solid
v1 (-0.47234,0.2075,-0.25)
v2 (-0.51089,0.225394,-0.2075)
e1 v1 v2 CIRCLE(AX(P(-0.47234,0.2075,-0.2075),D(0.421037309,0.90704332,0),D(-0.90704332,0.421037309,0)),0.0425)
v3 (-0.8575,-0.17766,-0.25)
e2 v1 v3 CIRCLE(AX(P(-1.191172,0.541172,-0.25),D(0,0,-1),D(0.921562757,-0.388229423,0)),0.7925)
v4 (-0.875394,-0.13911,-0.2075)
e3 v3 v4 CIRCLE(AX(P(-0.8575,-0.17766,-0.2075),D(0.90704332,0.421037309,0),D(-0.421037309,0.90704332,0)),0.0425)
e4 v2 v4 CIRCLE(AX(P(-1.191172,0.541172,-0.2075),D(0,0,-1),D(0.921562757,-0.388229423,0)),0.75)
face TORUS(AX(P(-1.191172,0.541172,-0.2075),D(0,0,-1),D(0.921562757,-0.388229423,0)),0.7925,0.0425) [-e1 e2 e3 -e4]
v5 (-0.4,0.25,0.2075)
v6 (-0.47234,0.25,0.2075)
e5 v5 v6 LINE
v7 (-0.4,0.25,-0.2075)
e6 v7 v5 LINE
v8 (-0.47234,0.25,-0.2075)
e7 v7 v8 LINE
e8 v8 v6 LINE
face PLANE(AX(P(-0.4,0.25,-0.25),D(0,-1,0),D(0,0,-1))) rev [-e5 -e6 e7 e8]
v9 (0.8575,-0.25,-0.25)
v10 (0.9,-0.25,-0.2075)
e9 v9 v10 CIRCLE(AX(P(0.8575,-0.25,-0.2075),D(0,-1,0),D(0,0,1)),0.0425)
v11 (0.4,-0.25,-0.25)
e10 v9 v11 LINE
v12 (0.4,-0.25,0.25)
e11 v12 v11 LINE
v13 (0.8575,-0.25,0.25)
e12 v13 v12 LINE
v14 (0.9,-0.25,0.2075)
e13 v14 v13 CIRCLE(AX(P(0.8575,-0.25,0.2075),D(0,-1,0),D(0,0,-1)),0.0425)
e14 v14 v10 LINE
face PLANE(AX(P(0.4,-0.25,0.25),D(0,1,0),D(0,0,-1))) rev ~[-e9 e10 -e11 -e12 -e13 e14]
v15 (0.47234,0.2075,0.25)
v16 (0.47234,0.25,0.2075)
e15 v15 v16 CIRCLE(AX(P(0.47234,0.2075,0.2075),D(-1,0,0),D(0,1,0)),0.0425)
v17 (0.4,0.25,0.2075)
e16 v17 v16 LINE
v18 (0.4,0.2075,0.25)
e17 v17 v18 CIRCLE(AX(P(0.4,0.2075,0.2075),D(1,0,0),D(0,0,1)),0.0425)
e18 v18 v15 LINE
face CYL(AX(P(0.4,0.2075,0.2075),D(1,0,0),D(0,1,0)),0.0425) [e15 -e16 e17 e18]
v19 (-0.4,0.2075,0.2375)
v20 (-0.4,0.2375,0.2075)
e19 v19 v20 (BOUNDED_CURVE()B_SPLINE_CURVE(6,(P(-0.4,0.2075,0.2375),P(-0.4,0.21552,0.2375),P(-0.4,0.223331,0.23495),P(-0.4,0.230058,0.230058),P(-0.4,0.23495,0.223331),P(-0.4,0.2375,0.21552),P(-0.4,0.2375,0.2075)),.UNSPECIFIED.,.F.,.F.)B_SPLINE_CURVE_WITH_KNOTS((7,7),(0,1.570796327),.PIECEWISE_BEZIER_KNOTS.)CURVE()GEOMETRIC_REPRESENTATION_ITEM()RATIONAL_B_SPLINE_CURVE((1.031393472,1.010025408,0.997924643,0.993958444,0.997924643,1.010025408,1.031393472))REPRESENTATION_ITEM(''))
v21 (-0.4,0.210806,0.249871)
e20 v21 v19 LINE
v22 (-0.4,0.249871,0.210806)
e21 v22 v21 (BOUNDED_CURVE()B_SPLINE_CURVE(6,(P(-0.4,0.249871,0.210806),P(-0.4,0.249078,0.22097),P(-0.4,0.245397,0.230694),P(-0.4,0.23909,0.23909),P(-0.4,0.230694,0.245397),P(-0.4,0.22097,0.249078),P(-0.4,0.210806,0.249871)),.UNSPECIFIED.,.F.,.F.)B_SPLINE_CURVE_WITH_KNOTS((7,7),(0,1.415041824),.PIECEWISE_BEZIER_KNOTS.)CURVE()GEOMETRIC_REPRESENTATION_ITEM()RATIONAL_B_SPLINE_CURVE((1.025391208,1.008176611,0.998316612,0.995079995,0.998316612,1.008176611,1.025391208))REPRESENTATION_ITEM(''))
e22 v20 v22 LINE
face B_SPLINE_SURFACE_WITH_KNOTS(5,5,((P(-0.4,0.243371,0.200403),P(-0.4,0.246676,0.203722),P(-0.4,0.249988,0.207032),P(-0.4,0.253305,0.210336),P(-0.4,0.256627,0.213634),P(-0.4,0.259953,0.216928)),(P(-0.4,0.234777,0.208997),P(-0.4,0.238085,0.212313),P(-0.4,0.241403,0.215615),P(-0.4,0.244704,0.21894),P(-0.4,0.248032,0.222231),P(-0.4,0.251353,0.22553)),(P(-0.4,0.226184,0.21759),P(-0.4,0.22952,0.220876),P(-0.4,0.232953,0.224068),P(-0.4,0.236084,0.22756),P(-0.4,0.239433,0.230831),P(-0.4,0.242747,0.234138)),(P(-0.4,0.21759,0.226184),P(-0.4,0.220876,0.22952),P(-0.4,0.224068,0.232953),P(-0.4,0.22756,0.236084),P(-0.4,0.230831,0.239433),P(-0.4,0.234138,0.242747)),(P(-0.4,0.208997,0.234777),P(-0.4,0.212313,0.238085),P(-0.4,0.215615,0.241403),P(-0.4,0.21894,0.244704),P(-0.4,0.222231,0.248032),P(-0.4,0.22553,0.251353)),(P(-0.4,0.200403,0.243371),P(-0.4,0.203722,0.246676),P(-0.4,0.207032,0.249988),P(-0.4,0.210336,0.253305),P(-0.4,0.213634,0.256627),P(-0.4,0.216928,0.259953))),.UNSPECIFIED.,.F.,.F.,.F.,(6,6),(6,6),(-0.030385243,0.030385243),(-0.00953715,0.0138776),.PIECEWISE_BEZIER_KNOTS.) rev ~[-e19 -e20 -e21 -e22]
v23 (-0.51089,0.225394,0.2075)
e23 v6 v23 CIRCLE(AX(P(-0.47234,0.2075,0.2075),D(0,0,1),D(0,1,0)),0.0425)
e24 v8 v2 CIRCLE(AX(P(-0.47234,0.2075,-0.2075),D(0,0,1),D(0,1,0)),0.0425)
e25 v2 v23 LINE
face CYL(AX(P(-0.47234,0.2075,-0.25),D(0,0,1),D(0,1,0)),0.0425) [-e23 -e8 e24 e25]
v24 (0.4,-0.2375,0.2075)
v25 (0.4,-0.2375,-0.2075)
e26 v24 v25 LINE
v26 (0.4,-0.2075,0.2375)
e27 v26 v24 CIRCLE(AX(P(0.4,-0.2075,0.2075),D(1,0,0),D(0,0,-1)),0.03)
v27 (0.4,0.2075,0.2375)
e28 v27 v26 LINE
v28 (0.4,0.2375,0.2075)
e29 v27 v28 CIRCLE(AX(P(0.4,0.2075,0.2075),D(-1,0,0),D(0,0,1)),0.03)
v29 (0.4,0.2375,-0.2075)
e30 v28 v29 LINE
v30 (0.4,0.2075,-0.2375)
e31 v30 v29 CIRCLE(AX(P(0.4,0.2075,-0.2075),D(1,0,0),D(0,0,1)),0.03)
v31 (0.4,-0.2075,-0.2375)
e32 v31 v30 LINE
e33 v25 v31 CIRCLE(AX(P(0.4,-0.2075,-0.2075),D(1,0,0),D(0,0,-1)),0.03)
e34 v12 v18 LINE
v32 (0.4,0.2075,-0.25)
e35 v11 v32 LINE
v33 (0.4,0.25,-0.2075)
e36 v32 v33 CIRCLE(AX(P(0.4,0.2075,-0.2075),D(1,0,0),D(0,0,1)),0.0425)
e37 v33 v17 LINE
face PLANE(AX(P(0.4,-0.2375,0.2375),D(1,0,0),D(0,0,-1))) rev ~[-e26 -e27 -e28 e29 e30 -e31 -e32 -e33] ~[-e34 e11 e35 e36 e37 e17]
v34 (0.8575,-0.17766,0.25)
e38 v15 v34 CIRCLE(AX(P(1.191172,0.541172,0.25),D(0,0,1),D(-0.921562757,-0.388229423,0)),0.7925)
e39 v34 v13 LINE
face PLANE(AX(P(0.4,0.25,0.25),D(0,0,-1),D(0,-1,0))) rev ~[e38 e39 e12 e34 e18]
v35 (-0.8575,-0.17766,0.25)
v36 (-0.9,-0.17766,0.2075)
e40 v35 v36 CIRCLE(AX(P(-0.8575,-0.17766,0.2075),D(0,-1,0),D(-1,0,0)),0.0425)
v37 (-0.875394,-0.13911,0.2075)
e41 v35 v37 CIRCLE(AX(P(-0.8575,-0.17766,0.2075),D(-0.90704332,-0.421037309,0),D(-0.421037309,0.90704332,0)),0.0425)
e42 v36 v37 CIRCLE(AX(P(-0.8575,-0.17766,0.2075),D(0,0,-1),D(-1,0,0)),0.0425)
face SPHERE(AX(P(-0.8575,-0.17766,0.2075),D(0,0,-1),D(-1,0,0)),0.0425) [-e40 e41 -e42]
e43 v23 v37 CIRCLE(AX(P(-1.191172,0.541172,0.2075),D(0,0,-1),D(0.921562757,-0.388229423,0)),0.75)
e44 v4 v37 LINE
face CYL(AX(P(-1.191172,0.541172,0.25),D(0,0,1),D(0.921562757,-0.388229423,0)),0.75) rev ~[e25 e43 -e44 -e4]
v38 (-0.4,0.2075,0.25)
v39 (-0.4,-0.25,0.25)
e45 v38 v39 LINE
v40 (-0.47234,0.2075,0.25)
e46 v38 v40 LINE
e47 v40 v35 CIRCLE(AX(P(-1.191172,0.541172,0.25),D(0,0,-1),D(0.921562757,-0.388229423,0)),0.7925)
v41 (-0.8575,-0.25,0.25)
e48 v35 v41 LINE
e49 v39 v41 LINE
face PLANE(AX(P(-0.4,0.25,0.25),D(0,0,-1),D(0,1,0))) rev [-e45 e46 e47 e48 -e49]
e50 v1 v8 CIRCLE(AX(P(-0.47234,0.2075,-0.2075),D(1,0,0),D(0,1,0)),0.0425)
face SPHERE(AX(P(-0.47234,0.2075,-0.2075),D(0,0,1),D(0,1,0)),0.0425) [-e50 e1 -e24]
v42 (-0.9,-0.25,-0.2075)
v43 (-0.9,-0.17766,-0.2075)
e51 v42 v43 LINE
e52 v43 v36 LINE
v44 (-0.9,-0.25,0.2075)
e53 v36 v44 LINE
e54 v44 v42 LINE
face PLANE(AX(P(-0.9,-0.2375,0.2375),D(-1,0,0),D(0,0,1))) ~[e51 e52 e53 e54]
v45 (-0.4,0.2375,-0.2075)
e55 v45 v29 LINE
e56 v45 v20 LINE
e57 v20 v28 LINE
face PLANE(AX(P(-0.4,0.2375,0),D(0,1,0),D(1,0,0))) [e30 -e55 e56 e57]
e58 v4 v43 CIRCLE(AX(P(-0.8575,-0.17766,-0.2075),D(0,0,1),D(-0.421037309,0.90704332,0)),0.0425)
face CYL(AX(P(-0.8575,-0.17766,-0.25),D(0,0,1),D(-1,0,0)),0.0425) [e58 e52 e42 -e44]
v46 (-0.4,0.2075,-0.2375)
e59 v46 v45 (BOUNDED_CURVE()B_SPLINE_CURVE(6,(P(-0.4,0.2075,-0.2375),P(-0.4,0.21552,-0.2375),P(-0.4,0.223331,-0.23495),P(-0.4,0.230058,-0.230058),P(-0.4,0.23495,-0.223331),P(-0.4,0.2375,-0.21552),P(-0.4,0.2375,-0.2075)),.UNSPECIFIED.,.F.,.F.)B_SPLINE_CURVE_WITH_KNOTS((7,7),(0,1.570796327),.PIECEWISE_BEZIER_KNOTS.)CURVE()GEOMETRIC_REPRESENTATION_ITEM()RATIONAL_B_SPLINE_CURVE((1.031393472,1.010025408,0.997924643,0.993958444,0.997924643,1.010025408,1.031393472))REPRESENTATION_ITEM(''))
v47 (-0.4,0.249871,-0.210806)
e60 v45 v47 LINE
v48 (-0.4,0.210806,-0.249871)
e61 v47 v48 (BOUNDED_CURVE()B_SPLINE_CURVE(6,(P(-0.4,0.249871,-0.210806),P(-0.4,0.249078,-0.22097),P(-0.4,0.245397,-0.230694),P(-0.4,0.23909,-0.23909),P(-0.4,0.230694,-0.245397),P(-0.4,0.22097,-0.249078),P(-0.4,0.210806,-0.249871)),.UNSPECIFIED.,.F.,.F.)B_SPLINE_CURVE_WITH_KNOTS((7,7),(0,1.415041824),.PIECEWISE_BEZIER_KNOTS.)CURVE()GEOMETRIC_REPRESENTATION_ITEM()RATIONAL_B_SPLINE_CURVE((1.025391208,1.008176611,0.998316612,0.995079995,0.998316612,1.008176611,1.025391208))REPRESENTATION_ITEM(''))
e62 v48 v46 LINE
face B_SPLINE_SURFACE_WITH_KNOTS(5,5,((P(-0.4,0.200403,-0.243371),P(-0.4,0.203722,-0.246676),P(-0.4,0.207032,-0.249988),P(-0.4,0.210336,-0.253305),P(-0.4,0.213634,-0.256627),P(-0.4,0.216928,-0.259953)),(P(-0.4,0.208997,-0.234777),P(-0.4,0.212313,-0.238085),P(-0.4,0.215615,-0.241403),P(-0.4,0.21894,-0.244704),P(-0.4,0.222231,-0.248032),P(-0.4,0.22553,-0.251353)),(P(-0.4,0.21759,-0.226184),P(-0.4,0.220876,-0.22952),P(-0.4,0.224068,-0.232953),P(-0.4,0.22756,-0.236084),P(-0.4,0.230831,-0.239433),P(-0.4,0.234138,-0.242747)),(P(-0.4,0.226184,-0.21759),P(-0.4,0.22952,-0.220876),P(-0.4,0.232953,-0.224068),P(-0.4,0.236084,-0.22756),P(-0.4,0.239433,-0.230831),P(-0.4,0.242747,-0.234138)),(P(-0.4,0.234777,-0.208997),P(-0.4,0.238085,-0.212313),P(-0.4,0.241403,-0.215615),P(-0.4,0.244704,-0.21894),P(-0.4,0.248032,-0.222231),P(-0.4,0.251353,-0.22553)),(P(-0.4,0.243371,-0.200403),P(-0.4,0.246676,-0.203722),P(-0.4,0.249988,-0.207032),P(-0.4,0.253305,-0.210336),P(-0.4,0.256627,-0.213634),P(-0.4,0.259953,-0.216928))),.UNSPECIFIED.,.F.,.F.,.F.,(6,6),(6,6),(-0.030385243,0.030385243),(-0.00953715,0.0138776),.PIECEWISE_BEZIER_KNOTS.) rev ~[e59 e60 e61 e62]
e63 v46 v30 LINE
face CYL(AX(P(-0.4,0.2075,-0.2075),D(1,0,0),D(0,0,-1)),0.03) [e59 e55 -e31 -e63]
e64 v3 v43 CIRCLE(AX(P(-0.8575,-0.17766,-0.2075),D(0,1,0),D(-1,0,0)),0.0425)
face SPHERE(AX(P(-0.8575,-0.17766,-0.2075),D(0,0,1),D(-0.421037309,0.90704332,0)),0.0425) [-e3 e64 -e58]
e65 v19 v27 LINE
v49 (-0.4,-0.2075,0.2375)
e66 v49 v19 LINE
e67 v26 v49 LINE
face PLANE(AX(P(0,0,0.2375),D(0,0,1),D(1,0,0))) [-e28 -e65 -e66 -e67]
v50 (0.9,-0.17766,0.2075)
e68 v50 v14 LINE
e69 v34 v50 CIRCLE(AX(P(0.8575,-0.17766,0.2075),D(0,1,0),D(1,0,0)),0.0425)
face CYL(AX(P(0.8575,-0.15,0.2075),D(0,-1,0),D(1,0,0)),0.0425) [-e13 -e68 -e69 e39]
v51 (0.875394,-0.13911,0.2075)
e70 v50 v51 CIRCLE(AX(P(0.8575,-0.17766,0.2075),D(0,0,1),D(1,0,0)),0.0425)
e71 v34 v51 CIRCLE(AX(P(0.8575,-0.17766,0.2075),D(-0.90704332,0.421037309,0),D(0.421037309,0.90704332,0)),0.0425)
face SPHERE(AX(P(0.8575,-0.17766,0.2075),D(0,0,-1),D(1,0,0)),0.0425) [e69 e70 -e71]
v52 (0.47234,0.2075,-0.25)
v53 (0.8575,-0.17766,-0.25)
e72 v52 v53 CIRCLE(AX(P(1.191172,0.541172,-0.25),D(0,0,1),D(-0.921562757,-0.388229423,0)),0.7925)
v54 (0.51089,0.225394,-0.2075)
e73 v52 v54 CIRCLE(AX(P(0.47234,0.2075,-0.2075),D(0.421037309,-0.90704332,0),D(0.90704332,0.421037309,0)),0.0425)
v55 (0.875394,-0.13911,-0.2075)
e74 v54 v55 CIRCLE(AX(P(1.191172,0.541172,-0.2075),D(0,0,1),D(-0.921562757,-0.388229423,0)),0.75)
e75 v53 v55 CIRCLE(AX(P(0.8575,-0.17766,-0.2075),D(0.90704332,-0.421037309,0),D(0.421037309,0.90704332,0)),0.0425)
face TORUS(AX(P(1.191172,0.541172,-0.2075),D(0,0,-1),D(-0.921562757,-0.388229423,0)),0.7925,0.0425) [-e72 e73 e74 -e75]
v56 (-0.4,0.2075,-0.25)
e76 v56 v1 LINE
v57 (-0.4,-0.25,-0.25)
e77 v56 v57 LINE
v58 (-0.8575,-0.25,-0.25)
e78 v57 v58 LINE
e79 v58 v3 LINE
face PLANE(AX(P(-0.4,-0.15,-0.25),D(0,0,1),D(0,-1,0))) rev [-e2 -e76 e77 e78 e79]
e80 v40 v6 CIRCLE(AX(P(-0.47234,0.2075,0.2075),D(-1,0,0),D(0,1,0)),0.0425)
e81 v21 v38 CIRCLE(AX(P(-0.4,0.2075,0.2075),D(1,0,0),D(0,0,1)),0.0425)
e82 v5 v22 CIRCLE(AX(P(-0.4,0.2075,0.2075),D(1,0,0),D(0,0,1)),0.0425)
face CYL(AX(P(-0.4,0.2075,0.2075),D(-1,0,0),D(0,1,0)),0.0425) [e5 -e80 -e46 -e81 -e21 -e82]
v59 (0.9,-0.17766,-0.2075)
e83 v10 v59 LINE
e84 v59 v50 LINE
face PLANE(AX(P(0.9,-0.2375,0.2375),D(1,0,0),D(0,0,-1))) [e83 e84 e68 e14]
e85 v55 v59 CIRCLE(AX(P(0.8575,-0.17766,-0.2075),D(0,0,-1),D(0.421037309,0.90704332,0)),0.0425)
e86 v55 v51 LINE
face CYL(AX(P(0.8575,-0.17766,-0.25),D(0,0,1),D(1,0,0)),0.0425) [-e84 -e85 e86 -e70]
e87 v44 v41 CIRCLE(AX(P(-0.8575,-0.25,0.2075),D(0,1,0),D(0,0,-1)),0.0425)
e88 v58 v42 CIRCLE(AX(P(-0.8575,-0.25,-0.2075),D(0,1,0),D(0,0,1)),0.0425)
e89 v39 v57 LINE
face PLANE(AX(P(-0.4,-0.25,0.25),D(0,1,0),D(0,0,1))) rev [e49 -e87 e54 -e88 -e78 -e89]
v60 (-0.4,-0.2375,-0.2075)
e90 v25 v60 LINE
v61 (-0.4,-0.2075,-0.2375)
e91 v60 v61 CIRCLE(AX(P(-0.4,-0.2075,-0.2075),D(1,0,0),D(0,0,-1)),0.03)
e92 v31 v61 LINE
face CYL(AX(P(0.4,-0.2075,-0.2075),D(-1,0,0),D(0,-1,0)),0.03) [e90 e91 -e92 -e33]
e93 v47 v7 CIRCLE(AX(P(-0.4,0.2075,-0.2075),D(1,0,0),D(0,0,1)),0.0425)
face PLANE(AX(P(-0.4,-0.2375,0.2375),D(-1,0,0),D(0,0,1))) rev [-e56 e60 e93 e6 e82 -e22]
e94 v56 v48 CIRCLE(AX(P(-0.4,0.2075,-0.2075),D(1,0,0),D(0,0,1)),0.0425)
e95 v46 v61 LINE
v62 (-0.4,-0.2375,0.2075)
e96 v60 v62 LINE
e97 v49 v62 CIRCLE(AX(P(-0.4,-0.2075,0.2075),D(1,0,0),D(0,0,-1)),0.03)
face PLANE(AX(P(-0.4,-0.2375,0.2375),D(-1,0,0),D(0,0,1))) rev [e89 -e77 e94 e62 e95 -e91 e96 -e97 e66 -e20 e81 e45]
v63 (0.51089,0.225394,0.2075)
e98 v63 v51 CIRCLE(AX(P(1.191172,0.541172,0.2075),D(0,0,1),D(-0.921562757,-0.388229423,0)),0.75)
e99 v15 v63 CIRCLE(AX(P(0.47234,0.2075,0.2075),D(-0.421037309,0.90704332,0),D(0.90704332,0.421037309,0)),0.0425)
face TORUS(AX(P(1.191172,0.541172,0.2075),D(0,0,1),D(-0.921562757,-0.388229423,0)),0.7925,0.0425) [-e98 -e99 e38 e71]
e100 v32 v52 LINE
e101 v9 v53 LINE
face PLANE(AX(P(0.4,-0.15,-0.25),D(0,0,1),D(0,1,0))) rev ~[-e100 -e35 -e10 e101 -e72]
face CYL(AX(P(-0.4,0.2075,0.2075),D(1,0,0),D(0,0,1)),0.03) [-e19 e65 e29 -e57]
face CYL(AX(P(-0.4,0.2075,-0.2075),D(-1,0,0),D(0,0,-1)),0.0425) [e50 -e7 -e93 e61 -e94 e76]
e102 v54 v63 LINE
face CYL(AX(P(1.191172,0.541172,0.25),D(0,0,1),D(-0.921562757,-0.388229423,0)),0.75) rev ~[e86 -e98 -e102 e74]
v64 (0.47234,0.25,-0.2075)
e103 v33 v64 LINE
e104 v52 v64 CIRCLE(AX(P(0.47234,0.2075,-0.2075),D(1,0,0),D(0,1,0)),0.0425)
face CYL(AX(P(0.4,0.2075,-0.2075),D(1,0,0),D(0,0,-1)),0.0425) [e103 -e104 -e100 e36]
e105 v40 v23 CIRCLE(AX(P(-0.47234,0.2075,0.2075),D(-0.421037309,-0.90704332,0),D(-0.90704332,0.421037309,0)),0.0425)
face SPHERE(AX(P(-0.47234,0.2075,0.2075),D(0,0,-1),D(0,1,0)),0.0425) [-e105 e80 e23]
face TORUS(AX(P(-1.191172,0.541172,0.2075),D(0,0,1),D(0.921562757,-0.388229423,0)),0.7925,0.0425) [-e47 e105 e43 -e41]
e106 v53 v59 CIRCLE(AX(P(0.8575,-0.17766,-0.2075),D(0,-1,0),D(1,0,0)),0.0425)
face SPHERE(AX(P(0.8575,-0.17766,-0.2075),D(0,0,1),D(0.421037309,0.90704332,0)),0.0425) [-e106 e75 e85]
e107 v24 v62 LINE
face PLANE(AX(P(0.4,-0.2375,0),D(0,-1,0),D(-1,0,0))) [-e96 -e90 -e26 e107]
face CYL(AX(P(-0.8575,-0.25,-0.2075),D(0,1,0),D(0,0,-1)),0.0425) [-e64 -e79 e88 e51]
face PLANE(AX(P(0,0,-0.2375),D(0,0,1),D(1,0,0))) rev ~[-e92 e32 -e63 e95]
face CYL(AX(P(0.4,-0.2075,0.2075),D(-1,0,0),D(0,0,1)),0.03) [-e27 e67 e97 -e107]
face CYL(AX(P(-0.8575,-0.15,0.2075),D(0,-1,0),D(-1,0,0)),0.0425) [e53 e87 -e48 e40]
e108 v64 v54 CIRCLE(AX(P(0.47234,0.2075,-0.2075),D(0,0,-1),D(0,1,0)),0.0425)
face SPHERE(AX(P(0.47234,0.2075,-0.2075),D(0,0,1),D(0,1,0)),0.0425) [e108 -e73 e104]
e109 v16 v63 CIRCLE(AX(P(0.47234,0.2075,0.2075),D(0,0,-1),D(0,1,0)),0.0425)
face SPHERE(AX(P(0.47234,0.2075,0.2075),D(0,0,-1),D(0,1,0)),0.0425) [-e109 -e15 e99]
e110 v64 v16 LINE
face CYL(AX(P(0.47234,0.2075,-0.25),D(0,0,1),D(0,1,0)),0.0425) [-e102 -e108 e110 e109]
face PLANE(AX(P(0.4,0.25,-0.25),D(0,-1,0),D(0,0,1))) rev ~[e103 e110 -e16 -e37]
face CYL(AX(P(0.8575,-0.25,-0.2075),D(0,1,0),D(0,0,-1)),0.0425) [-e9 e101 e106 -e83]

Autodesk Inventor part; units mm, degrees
ref_plane "YZ Plane" through (0, 0, 0) normal (1, 0, 0) x (0, 1, 0)
ref_plane "XZ Plane" through (0, 0, 0) normal (0, 1, 0) x (-1, 0, 0)
ref_plane "XY Plane" through (0, 0, 0) normal (0, 0, 1) x (1, 0, 0)
sketch "Sketch10" plane through (0, 0, 0) normal (0, 0, 1) x (1, 0, 0)
  line L0 (-0.4, 0.2375) -> (0.4, 0.2375)
  line L1 (0.4, 0.2375) -> (0.4, -0.2375)
  line L2 (0.4, -0.2375) -> (-0.4, -0.2375)
  line L3 (-0.4, -0.2375) -> (-0.4, 0.2375)
  point P0 (0, 0)
  point P1 (-0.4, 0)
  point P2 (0, 0.2375)
  dimension "d7" = 0.8
  dimension "d8" = 0.475
extrude "Extrusion4" add sketch "Sketch10" along normal mid plane 0.475
sketch "Sketch11" plane through (0.4, -0.2375, 0.2375) normal (1, 0, 0) x (0, 0, -1)
  line L0 (0, 0.475) -> (0.475, 0.475) construction
  line L1 (0, 0) -> (0, 0.475) construction
  line L2 (0, 0) -> (0.475, 0) construction
  line L3 (0.475, 0.475) -> (0.475, 0) construction
  line L4 (0.4875, 0.4875) -> (-0.0125, 0.4875)
  line L5 (-0.0125, 0.4875) -> (-0.0125, -0.0125)
  line L6 (-0.0125, -0.0125) -> (0.4875, -0.0125)
  line L7 (0.4875, -0.0125) -> (0.4875, 0.4875)
  line L8 (-0.0125, -0.0125) -> (0.4875, -0.0125)
  line L9 (0.4875, -0.0125) -> (0.4875, 0.0875)
  line L10 (0.4875, 0.0875) -> (-0.0125, 0.0875)
  line L11 (-0.0125, 0.0875) -> (-0.0125, -0.0125)
  point P0 (0.2375, 0.2375)
  dimension "d11" = 0.5
  dimension "d14" = 0.1
extrude "Extrusion5" add sketch "Sketch11" along normal blind 0.1
extrude "Extrusion6" add sketch "Sketch11" along normal blind 0.5 contours L7 L6 L5 L10
fillet "Fillet1" radius 0.75 1 edges at (0.5, -0.15, 0)
fillet "Fillet2" radius 0.0425 8 edges at (0.45, 0.25, -0.25) (0.45, 0.25, 0.25) (0.6608, 0.0108, 0.25) (0.6608, 0.0108, -0.25) (0.9, -0.2, -0.25) (0.9, -0.15, 0) (0.9, -0.2, 0.25) (0.5, 0.25, 0)
mirror "Mirror1" about plane through (0, 0, 0) normal (1, 0, 0) of "Extrusion5", "Fillet1", "Fillet2", "Extrusion6"
fillet "Fillet3" radius 0.03 4 edges at (0, 0.2375, -0.2375) (0, 0.2375, 0.2375) (0, -0.2375, -0.2375) (0, -0.2375, 0.2375)
equation "\"d9\" = d8"
properties part number "GRM155R61E105KA12D Capacitor" material "Laminate, Ivory, Matte"
